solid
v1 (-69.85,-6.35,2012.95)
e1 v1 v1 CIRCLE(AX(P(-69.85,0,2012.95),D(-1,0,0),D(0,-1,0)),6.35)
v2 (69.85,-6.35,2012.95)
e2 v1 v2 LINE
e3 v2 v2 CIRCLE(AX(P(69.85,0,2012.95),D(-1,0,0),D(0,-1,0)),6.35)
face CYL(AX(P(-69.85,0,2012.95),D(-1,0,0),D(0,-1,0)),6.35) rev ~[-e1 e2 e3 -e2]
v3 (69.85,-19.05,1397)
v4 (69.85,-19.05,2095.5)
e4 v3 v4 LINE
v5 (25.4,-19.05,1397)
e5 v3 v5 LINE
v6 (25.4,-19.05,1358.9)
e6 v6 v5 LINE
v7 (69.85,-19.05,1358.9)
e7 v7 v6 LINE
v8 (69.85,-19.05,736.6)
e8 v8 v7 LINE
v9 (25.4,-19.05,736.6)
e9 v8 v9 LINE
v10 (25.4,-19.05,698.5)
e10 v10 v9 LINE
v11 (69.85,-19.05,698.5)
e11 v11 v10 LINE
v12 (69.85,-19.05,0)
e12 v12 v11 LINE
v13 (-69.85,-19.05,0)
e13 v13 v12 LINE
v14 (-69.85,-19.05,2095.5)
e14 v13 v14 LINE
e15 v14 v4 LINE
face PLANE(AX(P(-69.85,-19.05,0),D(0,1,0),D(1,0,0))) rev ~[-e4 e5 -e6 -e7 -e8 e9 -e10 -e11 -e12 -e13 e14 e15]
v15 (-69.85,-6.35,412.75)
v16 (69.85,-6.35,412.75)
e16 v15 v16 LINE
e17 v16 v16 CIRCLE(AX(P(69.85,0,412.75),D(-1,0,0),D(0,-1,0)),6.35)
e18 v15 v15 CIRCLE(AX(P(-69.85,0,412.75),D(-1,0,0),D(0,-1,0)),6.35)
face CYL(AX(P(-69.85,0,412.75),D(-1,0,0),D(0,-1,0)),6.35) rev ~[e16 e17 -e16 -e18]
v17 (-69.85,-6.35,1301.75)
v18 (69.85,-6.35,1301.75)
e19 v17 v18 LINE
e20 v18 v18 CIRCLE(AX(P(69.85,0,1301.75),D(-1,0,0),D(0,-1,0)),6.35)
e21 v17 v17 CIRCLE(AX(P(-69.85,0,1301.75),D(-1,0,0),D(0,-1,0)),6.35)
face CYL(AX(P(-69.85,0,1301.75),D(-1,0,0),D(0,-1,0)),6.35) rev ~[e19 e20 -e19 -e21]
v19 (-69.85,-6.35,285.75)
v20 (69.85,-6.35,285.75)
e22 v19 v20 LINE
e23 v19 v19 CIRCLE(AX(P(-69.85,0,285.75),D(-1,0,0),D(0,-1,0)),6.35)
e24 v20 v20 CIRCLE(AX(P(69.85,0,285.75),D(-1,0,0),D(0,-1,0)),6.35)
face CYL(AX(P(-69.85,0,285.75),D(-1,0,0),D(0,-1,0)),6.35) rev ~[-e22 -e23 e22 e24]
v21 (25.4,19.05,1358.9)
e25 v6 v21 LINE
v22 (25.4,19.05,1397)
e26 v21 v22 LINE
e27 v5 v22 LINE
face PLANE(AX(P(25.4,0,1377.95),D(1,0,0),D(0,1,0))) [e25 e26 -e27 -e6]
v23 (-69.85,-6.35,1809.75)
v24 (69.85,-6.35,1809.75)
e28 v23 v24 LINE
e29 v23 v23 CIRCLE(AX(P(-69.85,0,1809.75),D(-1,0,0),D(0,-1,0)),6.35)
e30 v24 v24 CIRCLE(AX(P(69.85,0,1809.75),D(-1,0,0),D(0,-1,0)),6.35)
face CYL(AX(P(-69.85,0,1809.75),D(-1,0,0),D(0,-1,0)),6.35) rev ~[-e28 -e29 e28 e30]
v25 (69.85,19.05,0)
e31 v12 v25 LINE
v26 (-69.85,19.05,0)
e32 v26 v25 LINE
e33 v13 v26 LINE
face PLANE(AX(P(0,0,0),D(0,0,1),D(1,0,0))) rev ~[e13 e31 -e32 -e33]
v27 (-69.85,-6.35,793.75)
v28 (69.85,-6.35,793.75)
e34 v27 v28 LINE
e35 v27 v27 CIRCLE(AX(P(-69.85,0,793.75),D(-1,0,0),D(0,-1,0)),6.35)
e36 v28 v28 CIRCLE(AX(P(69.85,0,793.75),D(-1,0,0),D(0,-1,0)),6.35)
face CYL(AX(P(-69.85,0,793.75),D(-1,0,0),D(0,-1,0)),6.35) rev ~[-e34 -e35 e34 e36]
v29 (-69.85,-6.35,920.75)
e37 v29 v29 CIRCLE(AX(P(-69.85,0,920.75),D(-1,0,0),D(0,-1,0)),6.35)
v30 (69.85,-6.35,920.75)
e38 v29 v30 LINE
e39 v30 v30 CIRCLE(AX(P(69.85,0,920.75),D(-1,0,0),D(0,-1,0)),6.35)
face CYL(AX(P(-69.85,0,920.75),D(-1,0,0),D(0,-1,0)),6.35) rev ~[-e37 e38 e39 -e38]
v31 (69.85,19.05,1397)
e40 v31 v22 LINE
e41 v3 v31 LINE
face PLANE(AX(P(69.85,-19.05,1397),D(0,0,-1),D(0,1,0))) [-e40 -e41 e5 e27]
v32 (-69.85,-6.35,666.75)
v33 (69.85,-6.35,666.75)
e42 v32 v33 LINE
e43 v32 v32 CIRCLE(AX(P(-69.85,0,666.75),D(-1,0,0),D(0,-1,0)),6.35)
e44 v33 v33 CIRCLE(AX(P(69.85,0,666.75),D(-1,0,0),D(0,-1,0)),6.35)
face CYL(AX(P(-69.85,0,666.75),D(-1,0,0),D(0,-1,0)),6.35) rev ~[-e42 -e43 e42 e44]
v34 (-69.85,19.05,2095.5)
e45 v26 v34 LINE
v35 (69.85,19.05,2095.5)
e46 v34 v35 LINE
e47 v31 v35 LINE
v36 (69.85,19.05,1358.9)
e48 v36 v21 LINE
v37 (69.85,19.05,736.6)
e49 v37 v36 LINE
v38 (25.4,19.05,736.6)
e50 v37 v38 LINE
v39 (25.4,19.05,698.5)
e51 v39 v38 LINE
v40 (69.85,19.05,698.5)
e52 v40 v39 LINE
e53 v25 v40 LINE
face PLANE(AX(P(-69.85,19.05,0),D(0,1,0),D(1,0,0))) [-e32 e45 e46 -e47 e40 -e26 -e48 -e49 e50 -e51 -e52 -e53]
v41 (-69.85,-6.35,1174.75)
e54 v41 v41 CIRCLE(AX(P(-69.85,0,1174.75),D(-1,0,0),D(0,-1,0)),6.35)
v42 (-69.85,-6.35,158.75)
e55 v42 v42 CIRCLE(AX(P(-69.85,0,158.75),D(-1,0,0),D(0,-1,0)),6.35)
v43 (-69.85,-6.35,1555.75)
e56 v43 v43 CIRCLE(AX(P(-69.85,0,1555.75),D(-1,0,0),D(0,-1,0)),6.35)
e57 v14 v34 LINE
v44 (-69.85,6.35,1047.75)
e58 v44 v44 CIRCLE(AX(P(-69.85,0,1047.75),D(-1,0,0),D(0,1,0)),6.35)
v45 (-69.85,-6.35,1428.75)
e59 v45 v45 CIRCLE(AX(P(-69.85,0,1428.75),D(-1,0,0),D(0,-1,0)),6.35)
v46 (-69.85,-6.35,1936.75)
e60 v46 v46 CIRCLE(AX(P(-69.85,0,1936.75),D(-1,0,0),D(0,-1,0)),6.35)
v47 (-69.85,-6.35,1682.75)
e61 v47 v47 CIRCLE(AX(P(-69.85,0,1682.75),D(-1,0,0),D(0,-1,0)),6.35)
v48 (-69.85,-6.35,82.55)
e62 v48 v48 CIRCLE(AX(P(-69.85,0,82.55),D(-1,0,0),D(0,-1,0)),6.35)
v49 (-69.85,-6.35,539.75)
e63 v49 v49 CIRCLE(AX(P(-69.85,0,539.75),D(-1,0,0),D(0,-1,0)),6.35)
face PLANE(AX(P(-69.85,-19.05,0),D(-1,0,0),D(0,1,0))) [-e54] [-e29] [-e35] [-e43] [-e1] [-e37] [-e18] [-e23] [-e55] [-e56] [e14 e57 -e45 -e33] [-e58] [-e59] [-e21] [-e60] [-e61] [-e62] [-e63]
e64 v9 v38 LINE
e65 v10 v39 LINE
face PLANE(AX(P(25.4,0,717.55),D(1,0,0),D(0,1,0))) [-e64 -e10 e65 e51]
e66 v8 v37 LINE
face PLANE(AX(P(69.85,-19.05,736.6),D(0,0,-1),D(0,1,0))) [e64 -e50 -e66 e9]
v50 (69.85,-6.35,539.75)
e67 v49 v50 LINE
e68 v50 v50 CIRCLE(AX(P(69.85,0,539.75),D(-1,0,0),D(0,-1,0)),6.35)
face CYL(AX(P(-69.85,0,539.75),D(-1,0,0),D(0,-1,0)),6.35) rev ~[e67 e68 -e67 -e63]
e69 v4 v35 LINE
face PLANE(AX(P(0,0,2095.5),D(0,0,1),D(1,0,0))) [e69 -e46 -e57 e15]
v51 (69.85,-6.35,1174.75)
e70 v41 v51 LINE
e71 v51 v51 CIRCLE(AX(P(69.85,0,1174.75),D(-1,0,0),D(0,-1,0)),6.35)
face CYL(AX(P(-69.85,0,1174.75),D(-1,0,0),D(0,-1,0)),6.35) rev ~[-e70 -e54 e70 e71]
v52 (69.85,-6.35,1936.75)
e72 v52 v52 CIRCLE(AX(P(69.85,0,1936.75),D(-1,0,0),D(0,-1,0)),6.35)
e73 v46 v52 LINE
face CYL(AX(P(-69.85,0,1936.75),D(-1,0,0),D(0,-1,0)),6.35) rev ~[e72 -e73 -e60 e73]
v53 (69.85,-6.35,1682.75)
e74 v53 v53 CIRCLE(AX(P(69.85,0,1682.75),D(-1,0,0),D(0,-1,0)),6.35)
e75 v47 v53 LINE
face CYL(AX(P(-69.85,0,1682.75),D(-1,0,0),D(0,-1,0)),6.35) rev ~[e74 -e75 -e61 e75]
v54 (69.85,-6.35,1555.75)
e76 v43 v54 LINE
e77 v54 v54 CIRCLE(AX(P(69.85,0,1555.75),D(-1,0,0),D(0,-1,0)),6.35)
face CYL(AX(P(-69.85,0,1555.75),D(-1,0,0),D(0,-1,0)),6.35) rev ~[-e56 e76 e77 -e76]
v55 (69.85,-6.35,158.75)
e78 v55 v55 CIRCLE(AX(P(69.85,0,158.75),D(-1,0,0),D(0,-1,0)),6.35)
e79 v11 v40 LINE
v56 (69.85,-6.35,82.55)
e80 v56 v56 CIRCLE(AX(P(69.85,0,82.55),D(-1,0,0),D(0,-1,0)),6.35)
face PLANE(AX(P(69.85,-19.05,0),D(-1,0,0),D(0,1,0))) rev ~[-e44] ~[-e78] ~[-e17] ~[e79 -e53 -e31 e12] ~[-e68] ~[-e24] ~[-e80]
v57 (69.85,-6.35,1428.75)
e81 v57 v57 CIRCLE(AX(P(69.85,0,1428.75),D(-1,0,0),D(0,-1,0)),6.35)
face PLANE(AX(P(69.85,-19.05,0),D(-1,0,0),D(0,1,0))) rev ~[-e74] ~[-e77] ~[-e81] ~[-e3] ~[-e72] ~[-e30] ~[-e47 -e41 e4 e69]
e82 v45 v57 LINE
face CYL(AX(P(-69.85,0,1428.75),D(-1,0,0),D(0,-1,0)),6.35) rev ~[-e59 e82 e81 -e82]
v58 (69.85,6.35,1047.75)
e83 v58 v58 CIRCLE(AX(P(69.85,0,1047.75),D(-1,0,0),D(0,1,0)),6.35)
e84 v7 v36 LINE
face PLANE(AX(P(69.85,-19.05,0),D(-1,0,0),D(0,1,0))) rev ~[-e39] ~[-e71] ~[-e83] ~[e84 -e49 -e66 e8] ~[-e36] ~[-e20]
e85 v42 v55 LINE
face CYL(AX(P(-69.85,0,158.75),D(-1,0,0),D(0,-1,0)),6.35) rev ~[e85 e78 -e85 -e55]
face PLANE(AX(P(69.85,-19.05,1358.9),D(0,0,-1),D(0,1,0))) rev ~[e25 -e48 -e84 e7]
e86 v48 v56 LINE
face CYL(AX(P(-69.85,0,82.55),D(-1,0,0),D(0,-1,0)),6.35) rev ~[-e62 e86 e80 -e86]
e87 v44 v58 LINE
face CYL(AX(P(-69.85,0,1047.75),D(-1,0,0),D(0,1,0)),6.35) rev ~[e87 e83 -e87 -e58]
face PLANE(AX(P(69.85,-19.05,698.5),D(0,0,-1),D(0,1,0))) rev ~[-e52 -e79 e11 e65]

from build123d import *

# Parameters (mm, degrees)
F0_W     = 139.7
F0_H     = 38.1
F1_DEPTH = 2095.5
F2_R     = 6.35
F3_DEPTH = 152.4
F4_W     = 38.1
F4_H     = 38.1
F5_DEPTH = 44.45


with BuildPart() as f1:
    # F0 (on Top) → F1 (new body)
    with BuildSketch(Plane.XY):
        Rectangle(F0_W, F0_H)
    extrude(amount=F1_DEPTH)

    # F2 (on face) → F3 (cut)
    with BuildSketch(Plane(origin=(-69.85, 0, 0), x_dir=(0, -1, 0), z_dir=(-1, 0, 0))):
        with BuildLine():
            ThreePointArc((6.35, 1047.75), (0, 1054.1), (-6.35, 1047.75))
            Line((-6.35, 1047.75), (6.35, 1047.75))
        make_face()
        with BuildLine():
            Line((6.35, 1047.75), (-6.35, 1047.75))
            ThreePointArc((-6.35, 1047.75), (0, 1041.4), (6.35, 1047.75))
        make_face()
        with Locations((0, 1174.75)):
            Circle(F2_R)
        with Locations((0, 1301.75)):
            Circle(F2_R)
        with Locations((0, 1428.75)):
            Circle(F2_R)
        with Locations((0, 1555.75)):
            Circle(F2_R)
        with Locations((0, 1682.75)):
            Circle(F2_R)
        with Locations((0, 1809.75)):
            Circle(F2_R)
        with Locations((0, 1936.75)):
            Circle(F2_R)
        with Locations((0, 920.75)):
            Circle(F2_R)
        with Locations((0, 666.75)):
            Circle(F2_R)
        with Locations((0, 539.75)):
            Circle(F2_R)
        with Locations((0, 412.75)):
            Circle(F2_R)
        with Locations((0, 285.75)):
            Circle(F2_R)
        with Locations((0, 158.75)):
            Circle(F2_R)
        with Locations((0, 793.75)):
            Circle(F2_R)
        with Locations((0, 2012.95)):
            Circle(F2_R)
        with Locations((0, 82.55)):
            Circle(F2_R)
    extrude(amount=-F3_DEPTH, mode=Mode.SUBTRACT)

    # F4 (on face) → F5 (cut)
    with BuildSketch(Plane.YZ.offset(69.85)):
        with Locations((0, 717.55)):
            Rectangle(F4_W, F4_H)
        with Locations((0, 1377.95)):
            Rectangle(F4_W, F4_H)
    extrude(amount=-F5_DEPTH, mode=Mode.SUBTRACT)


solid = f1.part
